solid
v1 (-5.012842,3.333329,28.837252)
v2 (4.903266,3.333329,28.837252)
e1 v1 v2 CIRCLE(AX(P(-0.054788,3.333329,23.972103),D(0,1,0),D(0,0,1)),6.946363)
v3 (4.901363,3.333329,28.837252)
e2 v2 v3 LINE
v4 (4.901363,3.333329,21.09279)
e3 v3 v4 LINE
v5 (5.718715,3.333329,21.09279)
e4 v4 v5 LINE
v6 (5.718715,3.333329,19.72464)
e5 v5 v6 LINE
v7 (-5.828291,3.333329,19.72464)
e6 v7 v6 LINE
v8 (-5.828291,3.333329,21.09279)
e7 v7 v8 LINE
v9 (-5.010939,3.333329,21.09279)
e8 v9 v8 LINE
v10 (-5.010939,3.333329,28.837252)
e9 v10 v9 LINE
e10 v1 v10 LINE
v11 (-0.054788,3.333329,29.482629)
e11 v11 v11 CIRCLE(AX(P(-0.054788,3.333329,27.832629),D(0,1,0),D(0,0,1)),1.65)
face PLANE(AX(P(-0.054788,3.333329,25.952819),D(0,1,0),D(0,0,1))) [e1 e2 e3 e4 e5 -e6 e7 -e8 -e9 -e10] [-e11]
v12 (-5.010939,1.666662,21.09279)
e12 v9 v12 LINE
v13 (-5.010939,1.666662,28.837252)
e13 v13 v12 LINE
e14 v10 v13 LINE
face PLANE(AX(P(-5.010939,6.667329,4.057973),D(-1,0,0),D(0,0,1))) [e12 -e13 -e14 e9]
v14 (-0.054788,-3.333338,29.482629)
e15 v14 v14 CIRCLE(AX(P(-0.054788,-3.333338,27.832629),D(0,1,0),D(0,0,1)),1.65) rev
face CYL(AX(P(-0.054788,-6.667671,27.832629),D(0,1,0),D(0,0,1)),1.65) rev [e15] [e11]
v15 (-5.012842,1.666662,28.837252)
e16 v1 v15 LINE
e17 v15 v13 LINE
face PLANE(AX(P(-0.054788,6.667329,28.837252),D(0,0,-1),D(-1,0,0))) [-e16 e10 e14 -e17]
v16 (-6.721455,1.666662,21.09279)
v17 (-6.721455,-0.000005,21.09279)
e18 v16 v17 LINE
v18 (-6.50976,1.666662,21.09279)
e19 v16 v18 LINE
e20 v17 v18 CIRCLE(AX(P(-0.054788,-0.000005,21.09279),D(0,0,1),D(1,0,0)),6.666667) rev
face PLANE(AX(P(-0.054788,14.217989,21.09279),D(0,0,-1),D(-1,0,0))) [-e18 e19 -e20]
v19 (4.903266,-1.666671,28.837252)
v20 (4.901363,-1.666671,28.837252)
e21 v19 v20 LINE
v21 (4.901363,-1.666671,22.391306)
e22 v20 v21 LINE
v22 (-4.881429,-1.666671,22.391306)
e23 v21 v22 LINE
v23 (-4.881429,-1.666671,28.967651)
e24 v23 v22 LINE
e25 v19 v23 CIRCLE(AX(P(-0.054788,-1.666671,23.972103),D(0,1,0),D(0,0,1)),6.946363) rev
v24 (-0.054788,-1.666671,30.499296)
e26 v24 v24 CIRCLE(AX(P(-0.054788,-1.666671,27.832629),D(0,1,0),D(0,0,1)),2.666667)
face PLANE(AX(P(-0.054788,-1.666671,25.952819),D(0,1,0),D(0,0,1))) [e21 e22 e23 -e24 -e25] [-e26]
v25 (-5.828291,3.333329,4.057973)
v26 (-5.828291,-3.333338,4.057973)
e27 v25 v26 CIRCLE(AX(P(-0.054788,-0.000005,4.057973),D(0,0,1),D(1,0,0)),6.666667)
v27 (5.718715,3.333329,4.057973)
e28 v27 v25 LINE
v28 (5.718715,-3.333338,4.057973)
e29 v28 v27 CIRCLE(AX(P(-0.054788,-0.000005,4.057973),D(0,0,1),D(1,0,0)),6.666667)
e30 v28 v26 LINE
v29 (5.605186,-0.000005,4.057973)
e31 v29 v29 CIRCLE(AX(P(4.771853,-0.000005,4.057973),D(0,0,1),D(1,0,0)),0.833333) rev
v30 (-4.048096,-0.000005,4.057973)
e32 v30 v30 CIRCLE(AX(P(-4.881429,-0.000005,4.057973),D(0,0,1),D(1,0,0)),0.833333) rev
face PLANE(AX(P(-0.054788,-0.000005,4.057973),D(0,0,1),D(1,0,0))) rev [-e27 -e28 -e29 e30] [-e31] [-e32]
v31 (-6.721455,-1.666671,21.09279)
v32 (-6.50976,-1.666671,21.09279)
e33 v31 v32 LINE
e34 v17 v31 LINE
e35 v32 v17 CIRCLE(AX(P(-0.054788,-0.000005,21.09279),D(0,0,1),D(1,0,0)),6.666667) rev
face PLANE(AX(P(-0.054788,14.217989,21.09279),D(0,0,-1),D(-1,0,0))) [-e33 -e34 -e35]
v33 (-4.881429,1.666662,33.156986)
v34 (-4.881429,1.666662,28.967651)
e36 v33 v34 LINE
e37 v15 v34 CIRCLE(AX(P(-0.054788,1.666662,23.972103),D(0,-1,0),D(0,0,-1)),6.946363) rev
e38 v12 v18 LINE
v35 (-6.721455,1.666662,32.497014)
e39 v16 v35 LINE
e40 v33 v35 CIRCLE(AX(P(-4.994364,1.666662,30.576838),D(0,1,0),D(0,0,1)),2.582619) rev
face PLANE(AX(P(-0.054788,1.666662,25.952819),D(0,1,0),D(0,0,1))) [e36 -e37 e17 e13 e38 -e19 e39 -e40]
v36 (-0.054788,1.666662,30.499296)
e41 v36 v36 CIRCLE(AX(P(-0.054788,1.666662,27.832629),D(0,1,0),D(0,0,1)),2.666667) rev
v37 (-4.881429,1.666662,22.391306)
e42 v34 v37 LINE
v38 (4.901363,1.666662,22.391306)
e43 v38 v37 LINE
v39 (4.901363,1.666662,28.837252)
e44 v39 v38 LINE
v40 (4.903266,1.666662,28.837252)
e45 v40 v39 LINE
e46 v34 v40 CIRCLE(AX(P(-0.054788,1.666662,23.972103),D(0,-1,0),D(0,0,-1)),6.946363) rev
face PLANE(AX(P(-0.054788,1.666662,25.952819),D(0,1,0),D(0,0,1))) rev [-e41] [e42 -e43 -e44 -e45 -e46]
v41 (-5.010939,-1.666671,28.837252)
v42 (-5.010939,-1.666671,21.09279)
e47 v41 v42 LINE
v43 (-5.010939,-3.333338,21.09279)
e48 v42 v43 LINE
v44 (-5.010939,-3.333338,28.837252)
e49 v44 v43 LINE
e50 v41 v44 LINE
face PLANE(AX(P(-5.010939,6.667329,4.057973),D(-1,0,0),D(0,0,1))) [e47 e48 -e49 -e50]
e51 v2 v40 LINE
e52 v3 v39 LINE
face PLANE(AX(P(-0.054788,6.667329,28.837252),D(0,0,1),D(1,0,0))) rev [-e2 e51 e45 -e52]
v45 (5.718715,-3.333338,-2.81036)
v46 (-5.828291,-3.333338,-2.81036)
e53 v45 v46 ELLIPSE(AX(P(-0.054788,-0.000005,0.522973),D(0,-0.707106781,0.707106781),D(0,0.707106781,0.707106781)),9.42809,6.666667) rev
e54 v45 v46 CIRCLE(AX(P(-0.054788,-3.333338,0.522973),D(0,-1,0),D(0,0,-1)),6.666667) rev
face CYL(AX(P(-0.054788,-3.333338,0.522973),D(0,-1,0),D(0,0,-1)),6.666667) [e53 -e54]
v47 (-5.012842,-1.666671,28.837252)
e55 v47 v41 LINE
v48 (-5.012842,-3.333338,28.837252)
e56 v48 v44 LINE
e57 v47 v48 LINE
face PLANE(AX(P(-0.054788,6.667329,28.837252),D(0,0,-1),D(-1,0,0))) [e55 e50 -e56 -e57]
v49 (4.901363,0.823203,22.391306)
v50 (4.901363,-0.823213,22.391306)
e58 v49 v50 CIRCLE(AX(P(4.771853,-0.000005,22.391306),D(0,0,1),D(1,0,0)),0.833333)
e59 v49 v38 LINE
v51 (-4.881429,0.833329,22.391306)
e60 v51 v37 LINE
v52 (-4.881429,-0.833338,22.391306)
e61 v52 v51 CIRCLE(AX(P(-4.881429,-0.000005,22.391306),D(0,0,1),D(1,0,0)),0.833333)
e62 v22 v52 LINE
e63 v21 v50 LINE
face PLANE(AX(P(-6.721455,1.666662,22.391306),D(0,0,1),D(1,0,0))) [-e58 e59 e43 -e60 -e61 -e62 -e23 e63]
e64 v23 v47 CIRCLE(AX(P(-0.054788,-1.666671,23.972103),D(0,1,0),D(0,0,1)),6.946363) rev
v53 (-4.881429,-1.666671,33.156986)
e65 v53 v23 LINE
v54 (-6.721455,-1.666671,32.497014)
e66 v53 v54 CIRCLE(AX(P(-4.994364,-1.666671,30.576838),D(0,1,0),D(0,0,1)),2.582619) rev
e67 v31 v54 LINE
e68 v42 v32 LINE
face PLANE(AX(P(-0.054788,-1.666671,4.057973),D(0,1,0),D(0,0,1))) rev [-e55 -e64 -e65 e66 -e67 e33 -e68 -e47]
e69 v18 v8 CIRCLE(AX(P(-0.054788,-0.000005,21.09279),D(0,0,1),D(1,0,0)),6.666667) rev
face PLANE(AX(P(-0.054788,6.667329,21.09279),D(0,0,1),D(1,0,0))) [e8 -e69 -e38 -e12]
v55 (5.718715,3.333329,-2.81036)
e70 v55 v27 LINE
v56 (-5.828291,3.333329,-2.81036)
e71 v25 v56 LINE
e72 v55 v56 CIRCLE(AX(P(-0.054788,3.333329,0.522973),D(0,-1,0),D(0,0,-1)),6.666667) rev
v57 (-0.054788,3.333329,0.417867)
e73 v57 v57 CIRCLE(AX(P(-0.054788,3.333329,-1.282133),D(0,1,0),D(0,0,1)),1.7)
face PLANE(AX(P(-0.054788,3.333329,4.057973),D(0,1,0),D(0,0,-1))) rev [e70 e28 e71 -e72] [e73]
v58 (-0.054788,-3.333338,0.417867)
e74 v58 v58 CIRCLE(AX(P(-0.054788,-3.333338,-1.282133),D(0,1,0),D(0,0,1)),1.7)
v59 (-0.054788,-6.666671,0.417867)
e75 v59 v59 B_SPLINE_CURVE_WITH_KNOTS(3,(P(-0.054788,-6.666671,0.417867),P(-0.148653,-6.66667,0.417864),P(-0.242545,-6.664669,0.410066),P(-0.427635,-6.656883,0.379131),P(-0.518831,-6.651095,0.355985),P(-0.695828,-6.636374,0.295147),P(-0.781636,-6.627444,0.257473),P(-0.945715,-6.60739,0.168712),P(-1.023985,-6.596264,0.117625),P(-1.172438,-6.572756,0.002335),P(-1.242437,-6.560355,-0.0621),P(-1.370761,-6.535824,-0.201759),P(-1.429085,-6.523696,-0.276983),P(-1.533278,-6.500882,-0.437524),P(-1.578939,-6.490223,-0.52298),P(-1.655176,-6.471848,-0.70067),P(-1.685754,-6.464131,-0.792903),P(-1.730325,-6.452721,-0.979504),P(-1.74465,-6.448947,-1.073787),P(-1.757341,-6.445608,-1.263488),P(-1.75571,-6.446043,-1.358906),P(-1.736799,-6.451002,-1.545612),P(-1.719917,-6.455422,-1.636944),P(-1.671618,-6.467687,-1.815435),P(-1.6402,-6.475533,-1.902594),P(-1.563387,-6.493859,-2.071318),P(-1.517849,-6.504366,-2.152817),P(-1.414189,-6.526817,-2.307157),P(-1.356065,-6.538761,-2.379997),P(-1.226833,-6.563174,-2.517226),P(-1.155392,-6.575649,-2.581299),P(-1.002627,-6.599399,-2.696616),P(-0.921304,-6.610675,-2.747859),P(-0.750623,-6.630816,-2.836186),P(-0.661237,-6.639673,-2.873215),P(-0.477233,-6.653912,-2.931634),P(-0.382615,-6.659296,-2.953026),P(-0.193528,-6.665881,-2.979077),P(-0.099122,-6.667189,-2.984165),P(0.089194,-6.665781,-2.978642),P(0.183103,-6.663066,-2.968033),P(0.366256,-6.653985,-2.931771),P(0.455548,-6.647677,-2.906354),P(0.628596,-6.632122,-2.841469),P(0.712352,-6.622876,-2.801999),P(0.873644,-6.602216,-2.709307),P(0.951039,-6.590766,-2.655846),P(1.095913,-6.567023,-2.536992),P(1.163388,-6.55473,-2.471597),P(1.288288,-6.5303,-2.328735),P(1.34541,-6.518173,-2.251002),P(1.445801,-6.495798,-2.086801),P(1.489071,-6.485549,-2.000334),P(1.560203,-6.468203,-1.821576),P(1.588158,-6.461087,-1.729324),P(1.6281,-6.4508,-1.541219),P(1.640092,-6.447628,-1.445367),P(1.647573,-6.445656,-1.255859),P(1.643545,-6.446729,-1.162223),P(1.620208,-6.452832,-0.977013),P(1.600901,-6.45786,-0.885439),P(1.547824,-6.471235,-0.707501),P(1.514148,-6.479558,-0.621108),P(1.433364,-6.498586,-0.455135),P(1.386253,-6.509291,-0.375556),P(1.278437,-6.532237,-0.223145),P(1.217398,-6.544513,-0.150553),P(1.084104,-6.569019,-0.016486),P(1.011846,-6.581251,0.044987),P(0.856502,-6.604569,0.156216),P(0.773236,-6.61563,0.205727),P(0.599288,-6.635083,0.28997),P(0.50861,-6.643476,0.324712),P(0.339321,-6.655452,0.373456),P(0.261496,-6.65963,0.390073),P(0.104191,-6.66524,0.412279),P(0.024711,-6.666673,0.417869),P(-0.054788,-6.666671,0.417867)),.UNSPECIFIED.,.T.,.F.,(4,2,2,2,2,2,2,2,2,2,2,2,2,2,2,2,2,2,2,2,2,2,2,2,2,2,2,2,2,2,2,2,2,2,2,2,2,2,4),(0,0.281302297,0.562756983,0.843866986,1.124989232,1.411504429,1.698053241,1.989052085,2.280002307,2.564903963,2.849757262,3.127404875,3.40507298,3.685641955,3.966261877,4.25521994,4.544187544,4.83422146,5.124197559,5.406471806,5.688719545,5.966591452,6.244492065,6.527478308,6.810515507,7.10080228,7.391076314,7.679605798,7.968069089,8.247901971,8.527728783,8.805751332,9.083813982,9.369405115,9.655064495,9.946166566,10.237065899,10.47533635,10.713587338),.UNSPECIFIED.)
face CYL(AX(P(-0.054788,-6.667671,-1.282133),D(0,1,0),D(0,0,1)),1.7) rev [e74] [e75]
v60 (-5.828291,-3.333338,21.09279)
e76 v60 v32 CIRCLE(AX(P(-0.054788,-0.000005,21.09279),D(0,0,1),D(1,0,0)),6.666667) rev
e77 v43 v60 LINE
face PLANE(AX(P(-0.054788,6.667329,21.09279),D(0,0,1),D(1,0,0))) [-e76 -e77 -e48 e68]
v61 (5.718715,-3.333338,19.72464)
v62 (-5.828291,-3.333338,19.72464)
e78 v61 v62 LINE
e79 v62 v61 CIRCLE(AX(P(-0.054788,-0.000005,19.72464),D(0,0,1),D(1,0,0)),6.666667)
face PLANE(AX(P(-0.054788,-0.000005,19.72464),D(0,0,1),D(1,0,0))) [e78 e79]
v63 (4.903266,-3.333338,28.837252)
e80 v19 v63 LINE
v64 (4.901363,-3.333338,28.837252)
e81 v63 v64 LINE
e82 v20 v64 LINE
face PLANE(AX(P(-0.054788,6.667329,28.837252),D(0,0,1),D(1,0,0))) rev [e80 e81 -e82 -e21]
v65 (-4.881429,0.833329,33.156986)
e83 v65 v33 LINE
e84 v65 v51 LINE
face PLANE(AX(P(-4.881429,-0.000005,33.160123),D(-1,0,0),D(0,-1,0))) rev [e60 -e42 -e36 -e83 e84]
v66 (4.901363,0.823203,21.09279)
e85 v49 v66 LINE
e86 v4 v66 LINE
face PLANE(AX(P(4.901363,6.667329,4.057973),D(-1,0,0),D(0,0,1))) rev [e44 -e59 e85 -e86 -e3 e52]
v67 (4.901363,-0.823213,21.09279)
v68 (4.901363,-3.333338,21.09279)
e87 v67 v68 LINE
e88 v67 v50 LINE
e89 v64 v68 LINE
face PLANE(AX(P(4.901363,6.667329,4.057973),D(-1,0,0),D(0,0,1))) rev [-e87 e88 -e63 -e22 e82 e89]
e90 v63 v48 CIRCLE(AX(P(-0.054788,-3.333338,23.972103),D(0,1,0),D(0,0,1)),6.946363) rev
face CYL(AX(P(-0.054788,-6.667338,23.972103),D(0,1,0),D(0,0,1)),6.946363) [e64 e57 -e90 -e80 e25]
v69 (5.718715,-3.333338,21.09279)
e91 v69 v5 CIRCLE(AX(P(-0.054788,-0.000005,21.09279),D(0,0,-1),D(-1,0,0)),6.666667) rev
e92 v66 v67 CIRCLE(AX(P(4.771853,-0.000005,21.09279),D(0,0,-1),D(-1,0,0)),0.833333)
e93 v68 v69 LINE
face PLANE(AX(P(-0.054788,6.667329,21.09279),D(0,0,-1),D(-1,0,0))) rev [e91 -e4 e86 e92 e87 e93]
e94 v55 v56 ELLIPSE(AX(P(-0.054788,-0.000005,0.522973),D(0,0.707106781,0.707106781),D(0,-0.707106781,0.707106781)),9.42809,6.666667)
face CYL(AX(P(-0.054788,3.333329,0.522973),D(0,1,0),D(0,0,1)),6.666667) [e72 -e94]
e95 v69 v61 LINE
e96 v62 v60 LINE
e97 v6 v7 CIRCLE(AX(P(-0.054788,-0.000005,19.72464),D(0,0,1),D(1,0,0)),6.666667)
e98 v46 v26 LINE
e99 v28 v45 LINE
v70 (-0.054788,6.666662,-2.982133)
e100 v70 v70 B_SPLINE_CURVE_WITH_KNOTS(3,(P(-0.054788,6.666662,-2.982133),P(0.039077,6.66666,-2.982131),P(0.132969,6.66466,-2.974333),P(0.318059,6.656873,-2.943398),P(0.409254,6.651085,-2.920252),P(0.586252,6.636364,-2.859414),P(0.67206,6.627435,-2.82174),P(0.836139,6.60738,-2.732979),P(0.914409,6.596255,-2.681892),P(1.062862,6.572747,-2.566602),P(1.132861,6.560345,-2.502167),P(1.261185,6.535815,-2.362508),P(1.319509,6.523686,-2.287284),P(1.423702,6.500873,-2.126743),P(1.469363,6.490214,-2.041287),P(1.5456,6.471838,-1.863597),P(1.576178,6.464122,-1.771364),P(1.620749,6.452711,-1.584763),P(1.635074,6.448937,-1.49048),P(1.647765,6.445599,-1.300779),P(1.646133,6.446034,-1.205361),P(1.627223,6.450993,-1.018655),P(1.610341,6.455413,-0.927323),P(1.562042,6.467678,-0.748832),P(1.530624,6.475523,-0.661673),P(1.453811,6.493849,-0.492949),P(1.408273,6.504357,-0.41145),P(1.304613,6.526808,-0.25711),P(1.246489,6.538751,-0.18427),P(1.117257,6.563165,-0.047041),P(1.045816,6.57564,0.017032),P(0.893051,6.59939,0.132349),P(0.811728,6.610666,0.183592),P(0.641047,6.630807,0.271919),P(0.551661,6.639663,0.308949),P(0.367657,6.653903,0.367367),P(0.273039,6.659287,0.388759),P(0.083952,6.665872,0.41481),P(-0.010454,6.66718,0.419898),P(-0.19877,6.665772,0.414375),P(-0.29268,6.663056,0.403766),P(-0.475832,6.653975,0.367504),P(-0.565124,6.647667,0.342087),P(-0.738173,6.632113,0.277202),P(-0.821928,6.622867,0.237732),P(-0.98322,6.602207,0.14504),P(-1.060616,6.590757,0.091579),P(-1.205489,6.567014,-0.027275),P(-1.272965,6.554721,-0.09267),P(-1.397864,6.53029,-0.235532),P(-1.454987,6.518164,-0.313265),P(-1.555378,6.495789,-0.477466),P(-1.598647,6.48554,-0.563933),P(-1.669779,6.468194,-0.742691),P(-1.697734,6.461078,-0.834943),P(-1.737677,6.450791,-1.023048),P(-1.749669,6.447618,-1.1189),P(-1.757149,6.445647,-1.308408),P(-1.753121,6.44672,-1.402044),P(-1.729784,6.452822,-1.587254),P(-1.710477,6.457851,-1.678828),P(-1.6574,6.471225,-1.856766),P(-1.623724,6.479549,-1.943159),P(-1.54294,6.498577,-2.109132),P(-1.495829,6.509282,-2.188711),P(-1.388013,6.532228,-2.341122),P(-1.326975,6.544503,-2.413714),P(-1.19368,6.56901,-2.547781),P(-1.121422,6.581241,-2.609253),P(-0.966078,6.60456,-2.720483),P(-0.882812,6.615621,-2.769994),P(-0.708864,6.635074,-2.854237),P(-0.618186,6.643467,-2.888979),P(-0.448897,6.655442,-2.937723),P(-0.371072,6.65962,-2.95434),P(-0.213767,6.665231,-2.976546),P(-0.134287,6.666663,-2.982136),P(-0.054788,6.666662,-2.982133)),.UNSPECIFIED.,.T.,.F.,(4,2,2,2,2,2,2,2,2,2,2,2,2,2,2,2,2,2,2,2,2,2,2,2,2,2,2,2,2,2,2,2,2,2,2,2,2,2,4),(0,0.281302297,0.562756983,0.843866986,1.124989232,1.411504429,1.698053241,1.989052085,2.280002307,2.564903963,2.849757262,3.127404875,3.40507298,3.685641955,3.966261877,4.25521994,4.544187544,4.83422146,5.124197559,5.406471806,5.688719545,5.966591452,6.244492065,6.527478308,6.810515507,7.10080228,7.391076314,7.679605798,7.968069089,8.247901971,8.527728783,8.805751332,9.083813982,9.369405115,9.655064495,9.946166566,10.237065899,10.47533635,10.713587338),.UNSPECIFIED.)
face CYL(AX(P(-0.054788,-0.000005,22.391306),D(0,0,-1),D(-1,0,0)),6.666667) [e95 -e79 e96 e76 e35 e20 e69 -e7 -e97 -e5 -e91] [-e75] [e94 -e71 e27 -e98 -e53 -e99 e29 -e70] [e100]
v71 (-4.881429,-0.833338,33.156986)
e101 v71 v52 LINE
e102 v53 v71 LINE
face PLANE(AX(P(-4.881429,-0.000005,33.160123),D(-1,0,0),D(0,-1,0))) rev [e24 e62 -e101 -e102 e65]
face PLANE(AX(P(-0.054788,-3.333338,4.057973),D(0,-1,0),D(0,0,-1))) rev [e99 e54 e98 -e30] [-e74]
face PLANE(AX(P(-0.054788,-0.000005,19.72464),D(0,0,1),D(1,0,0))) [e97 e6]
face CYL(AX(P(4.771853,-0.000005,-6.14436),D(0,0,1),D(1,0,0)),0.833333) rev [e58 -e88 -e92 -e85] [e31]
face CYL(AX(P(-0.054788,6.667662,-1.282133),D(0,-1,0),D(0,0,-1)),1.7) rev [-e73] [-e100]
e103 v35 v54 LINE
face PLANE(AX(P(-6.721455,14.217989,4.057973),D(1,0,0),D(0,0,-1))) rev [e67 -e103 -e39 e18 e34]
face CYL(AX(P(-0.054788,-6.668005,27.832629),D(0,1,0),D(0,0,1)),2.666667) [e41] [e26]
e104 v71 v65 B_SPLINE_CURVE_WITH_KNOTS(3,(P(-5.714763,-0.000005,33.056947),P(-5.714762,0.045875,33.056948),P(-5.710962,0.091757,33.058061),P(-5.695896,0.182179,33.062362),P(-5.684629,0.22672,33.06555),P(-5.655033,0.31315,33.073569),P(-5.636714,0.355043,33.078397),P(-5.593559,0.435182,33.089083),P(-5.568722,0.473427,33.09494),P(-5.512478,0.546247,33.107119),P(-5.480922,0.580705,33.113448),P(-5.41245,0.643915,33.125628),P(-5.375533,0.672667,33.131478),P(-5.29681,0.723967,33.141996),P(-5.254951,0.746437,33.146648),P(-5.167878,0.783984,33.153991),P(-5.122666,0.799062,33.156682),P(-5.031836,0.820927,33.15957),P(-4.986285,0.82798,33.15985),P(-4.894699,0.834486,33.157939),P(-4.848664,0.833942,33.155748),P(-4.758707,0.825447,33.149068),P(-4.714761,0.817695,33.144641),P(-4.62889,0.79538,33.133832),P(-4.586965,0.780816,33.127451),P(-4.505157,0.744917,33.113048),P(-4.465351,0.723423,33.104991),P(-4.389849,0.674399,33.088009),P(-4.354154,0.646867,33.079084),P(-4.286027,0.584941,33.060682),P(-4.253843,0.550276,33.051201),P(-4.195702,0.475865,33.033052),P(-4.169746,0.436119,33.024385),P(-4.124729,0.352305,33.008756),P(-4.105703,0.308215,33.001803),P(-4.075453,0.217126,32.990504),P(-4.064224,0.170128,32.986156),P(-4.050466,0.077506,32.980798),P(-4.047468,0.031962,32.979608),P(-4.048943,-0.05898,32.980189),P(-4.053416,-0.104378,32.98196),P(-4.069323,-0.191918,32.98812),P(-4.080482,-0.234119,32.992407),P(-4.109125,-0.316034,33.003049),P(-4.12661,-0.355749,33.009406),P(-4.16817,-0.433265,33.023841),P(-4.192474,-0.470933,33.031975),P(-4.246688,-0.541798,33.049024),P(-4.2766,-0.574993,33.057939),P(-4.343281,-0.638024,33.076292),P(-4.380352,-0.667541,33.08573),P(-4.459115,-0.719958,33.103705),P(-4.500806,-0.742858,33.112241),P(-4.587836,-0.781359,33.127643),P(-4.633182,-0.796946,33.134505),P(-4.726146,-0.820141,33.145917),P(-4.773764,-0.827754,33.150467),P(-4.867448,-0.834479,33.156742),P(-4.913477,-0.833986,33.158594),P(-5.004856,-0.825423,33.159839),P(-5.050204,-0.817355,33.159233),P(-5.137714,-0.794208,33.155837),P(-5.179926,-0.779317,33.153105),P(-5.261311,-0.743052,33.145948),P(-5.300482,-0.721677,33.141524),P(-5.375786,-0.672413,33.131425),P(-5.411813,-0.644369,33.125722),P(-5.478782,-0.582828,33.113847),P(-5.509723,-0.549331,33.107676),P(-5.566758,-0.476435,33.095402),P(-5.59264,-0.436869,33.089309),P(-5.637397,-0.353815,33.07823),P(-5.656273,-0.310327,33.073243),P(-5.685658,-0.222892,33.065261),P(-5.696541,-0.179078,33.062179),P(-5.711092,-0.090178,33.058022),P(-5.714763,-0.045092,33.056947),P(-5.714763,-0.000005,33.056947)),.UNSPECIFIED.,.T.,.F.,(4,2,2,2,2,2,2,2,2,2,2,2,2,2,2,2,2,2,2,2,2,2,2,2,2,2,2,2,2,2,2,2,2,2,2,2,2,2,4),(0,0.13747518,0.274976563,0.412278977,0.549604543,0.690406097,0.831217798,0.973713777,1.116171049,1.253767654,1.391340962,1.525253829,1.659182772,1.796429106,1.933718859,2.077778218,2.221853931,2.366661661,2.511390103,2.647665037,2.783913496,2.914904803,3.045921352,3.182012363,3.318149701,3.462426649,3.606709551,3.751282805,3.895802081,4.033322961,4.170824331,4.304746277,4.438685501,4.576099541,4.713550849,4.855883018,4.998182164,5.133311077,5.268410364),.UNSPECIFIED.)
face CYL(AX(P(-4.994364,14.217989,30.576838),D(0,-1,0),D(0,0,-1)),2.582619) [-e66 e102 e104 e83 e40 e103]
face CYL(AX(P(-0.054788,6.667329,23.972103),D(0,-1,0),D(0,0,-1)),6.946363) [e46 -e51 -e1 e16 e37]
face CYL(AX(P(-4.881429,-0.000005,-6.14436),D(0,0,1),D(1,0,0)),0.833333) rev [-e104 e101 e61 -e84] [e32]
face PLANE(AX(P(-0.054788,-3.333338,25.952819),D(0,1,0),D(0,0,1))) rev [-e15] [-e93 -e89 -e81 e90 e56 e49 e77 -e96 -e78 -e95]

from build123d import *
from build123d.topology import SkipClean

# Parameters (mm, degrees)
SKETCH2_R                       = 10
PHALANGE_LENGTH_DEPTH           = 27.5
BOSS_EXTRUDE3_DEPTH             = 5
BOSS_EXTRUDE4_DEPTH             = 5
BOSS_EXTRUDE4_DEPTH_BACK        = 5
CUT_EXTRUDE2_START              = -15.3025
CUT_EXTRUDE2_DEPTH              = 15.3025
SKETCH7_R                       = 1.65
CUT_EXTRUDE3_DEPTH              = 10
CUT_EXTRUDE4_DEPTH              = 2.5
CUT_EXTRUDE4_DEPTH_BACK         = 2.5
CUT_EXTRUDE7_REACH              = 48.49
SKETCH4_R                       = 1.65
CUT_EXTRUDE7_DIRECTION_2_REACH  = 48.49
CUT_EXTRUDE_THIN1_START         = 27.5
CUT_EXTRUDE_THIN1_DEPTH         = 10.361670454
BOSS_EXTRUDE5_REACH             = 47.744
SKETCH9_R                       = 4
SKETCH9_R_2                     = 1.65
CUT_EXTRUDE8_REACH              = 47.078
SKETCH10_R                      = 1.25
CUT_EXTRUDE9_START              = -4
CUT_EXTRUDE9_DEPTH              = 4
CUT_EXTRUDE10_REACH             = 47.744
CUT_EXTRUDE10_DIRECTION_2_REACH = 47.744
CUT_EXTRUDE11_START             = -10
CUT_EXTRUDE11_OUTLINE_W         = 2.565773848
CUT_EXTRUDE11_OUTLINE_H         = 11.6166929
CUT_EXTRUDE11_DEPTH             = 10
BOSS_EXTRUDE7_REACH             = 45.354
CUT_EXTRUDE12_REACH             = 47.078
SKETCH10_2_R                    = 1.25
CUT_EXTRUDE12_DIRECTION_2_REACH = 47.078
SKETCH17_R                      = 1.25
SKETCH17_W                      = 2.42123439
SKETCH17_H                      = 5
CUT_EXTRUDE14_DEPTH             = 16.148519
SCALE1_SCALE                    = 0.666666667
CUT_EXTRUDE15_START             = -10.000004
SKETCH18_R                      = 1.65
CUT_EXTRUDE15_DEPTH             = 13.333342
CUT_EXTRUDE16_START             = -3.333333
SKETCH19_R                      = 1.7
CUT_EXTRUDE16_DEPTH             = 13.333338


# Read off the part's stored shape, not the designer's step: Cut-Extrude-Thin1, Cut-Extrude11
with BuildPart() as part:
    # Sketch2 → Phalange Length (new body)
    with BuildSketch(Plane.XY):
        Circle(SKETCH2_R)
    extrude(amount=PHALANGE_LENGTH_DEPTH)

    # Sketch3 → Boss-Extrude3 (add)
    with BuildSketch(Plane(origin=(0, -10, 0), x_dir=(-1, 0, 0), z_dir=(0, -1, 0))):
        with BuildLine():
            Line((-10, 5.302499701), (-10, 0))
            Line((-10, 0), (10, 0))
            Line((10, 0), (10, 5.302499701))
            ThreePointArc((10, 5.302499701), (0, 15.302499701), (-10, 5.302499701))
        make_face()
    boss_extrude3 = extrude(amount=-BOSS_EXTRUDE3_DEPTH)

    # Mirror1: Boss-Extrude3 across plane
    add(boss_extrude3.mirror(Plane.ZX))

    # Sketch5 → Boss-Extrude4 (add, two sides: drawn at the far end of the back side and taken through both)
    with BuildSketch(Plane(origin=(0, 0, 0), x_dir=(1, 0, 0), z_dir=(0, 1, 0)).offset(-BOSS_EXTRUDE4_DEPTH_BACK)):
        with BuildLine():
            Line((-10, -33.283157911), (-10, -27.5))
            Line((-10, -27.5), (10, -27.5))
            Line((10, -27.5), (10, -33.283157911))
            ThreePointArc((10, -33.283157911), (0, -42.851984156), (-10, -33.283157911))
        make_face()
    extrude(amount=BOSS_EXTRUDE4_DEPTH + BOSS_EXTRUDE4_DEPTH_BACK)

    # Sketch6 → Cut-Extrude2 (cut)
    with SkipClean():  # the faces are left unmerged after this step: merging them gives an invalid solid
        with BuildSketch(Plane.XY.offset(CUT_EXTRUDE2_START)):
            with BuildLine():
                ThreePointArc((0, 10), (5, 8.660254038), (8.660254038, 5))
                Line((8.660254038, 5), (10, 5))
                Line((10, 5), (10, 10))
                Line((10, 10), (0, 10))
            make_face()
            with BuildLine():
                Line((10, -5), (8.660254038, -5))
                ThreePointArc((8.660254038, -5), (5, -8.660254038), (0, -10))
                Line((0, -10), (10, -10))
                Line((10, -10), (10, -5))
            make_face()
            with BuildLine():
                ThreePointArc((-8.660254038, 5), (-5, 8.660254038), (0, 10))
                Line((0, 10), (-10, 10))
                Line((-10, 10), (-10, 5))
                Line((-10, 5), (-8.660254038, 5))
            make_face()
            with BuildLine():
                Line((-10, -10), (0, -10))
                ThreePointArc((0, -10), (-5, -8.660254038), (-8.660254038, -5))
                Line((-8.660254038, -5), (-10, -5))
                Line((-10, -5), (-10, -10))
            make_face()
        extrude(amount=CUT_EXTRUDE2_DEPTH, mode=Mode.SUBTRACT)

    # Sketch7 → Cut-Extrude3 (cut)
    with SkipClean():  # the faces are left unmerged after this step: merging them gives an invalid solid
        with BuildSketch(Plane(origin=(0, 5, 0), x_dir=(1, 0, 0), z_dir=(0, 1, 0))):
            with Locations(Location((0, -35.661984156, 0), (0, 0, 270))):
                Circle(SKETCH7_R)
        extrude(amount=-CUT_EXTRUDE3_DEPTH, mode=Mode.SUBTRACT)

    # Sketch5<2> → Cut-Extrude4 (cut, two sides: drawn at the far end of the back side and taken through both)
    with BuildSketch(Plane(origin=(0, 0, 0), x_dir=(1, 0, 0), z_dir=(0, 1, 0)).offset(-CUT_EXTRUDE4_DEPTH_BACK)):
        with BuildLine():
            Line((-10, -33.283157911), (-10, -27.5))
            Line((-10, -27.5), (10, -27.5))
            Line((10, -27.5), (10, -33.283157911))
            ThreePointArc((10, -33.283157911), (0, -42.851984156), (-10, -33.283157911))
        make_face()
    extrude(amount=CUT_EXTRUDE4_DEPTH + CUT_EXTRUDE4_DEPTH_BACK, mode=Mode.SUBTRACT)

    # Sketch4 → Cut-Extrude7 (cut, up to next)
    with BuildSketch(Plane(origin=(0, -5, 0), x_dir=(1, 0, 0), z_dir=(0, 1, 0)), mode=Mode.PRIVATE) as cut_extrude7_sk1:
        with Locations(Location((0, 8.010159673, 0), (0, 0, 270))):
            Circle(SKETCH4_R)
    cut_extrude7_tool1 = extrude(cut_extrude7_sk1.sketch, amount=-CUT_EXTRUDE7_REACH, mode=Mode.PRIVATE) & part.part
    add(cut_extrude7_tool1.solids().sort_by_distance((0, -5, -8.01016))[0], mode=Mode.SUBTRACT)

    # Sketch4 → Cut-Extrude7 direction 2 (cut, up to next)
    with BuildSketch(Plane(origin=(0, -5, 0), x_dir=(1, 0, 0), z_dir=(0, 1, 0)), mode=Mode.PRIVATE) as cut_extrude7_direction_2_sk1:
        with Locations(Location((0, 8.010159673, 0), (0, 0, 270))):
            Circle(SKETCH4_R)
    cut_extrude7_direction_2_tool1 = extrude(cut_extrude7_direction_2_sk1.sketch, amount=CUT_EXTRUDE7_DIRECTION_2_REACH, mode=Mode.PRIVATE) & part.part
    add(cut_extrude7_direction_2_tool1.solids().sort_by_distance((0, -5, -8.01016))[0], mode=Mode.SUBTRACT)

    # Cut-Extrude-Thin1 outline → Cut-Extrude-Thin1 (cut)
    with SkipClean():  # the faces are left unmerged after this step: merging them gives an invalid solid
        with BuildSketch(Plane.XY.offset(CUT_EXTRUDE_THIN1_START)):
            with BuildLine():
                ThreePointArc((8.660254038, 5), (9.256147934, 3.78466979), (9.682458366, 2.5))
                Line((9.682458366, 2.5), (10, 2.5))
                Line((10, 2.5), (10, 5))
                Line((10, 5), (8.660254038, 5))
            make_face()
            with BuildLine():
                Line((10, -2.5), (9.682458366, -2.5))
                ThreePointArc((9.682458366, -2.5), (9.256147934, -3.78466979), (8.660254038, -5))
                Line((8.660254038, -5), (10, -5))
                Line((10, -5), (10, -2.5))
            make_face()
            with BuildLine():
                Line((-10, 2.5), (-9.682458366, 2.5))
                ThreePointArc((-9.682458366, 2.5), (-9.256147934, 3.78466979), (-8.660254038, 5))
                Line((-8.660254038, 5), (-10, 5))
                Line((-10, 5), (-10, 2.5))
            make_face()
            with BuildLine():
                ThreePointArc((-8.660254038, -5), (-9.256147934, -3.78466979), (-9.682458366, -2.5))
                Line((-9.682458366, -2.5), (-10, -2.5))
                Line((-10, -2.5), (-10, -5))
                Line((-10, -5), (-8.660254038, -5))
            make_face()
        extrude(amount=CUT_EXTRUDE_THIN1_DEPTH, mode=Mode.SUBTRACT)

    # Sketch9 → Boss-Extrude5 (add, up to next)
    with BuildSketch(Plane.XZ.offset(-2.5), mode=Mode.PRIVATE) as boss_extrude5_sk1:
        with Locations(Location((0, 35.661984156, 0), (0, 0, 90))):
            Circle(SKETCH9_R)
        with Locations(Location((0, 35.661984156, 0), (0, 0, 90))):
            Circle(SKETCH9_R_2, mode=Mode.SUBTRACT)
    boss_extrude5_tool1 = extrude(boss_extrude5_sk1.sketch, amount=BOSS_EXTRUDE5_REACH, mode=Mode.PRIVATE) - part.part
    add(boss_extrude5_tool1.solids().sort_by_distance((0, 2.5, 31.775121))[0])

    # Sketch10 → Cut-Extrude8 (cut, up to next)
    with BuildSketch(Plane.XY.offset(27.5), mode=Mode.PRIVATE) as cut_extrude8_sk1:
        with Locations((7.239961745, 0)):
            Circle(SKETCH10_R)
    cut_extrude8_tool1 = extrude(cut_extrude8_sk1.sketch, amount=-CUT_EXTRUDE8_REACH, mode=Mode.PRIVATE) & part.part
    # Sketch10 → Cut-Extrude8 (cut, up to next)
    with BuildSketch(Plane.XY.offset(27.5), mode=Mode.PRIVATE) as cut_extrude8_sk2:
        with Locations((-7.239961745, 0)):
            Circle(SKETCH10_R)
    cut_extrude8_tool2 = extrude(cut_extrude8_sk2.sketch, amount=-CUT_EXTRUDE8_REACH, mode=Mode.PRIVATE) & part.part
    add(cut_extrude8_tool1.solids().sort_by_distance((7.239962, 0, 27.5))[0], mode=Mode.SUBTRACT)
    add(cut_extrude8_tool2.solids().sort_by_distance((-7.239962, 0, 27.5))[0], mode=Mode.SUBTRACT)

    # Sketch11 → Cut-Extrude9 (cut)
    with SkipClean():  # the faces are left unmerged after this step: merging them gives an invalid solid
        with BuildSketch(Plane.XY.offset(27.5).offset(CUT_EXTRUDE9_START)):
            with BuildLine():
                ThreePointArc((8.660254038, 5), (0, 10), (-8.660254038, 5))
                Line((-8.660254038, 5), (8.660254038, 5))
            make_face()
            with BuildLine():
                Line((8.660254038, -5), (-8.660254038, -5))
                ThreePointArc((-8.660254038, -5), (0, -10), (8.660254038, -5))
            make_face()
        extrude(amount=CUT_EXTRUDE9_DEPTH, mode=Mode.SUBTRACT)

    # Sketch12 → Cut-Extrude10 (cut, up to next)
    with BuildSketch(Plane.XZ.offset(-2.5), mode=Mode.PRIVATE) as cut_extrude10_sk1:
        with BuildLine():
            Line((-10.033719202, 42.851984156), (-10.033719202, 35.664892021))
            Line((-10.033719202, 35.664892021), (-8.660254038, 35.664892021))
            ThreePointArc((-8.660254038, 35.664892021), (0, 40.290740593), (8.660254038, 35.664892021))
            Line((8.660254038, 35.664892021), (10.033719202, 35.664892021))
            Line((10.033719202, 35.664892021), (10.033719202, 42.851984156))
            Line((10.033719202, 42.851984156), (-10.033719202, 42.851984156))
        make_face()
    cut_extrude10_tool1 = extrude(cut_extrude10_sk1.sketch, amount=CUT_EXTRUDE10_REACH, mode=Mode.PRIVATE) & part.part
    add(cut_extrude10_tool1.solids().sort_by_distance((0, 2.5, 40.350279))[0], mode=Mode.SUBTRACT)

    # Sketch12 → Cut-Extrude10 direction 2 (cut, up to next)
    with BuildSketch(Plane.XZ.offset(-2.5), mode=Mode.PRIVATE) as cut_extrude10_direction_2_sk1:
        with BuildLine():
            Line((-10.033719202, 42.851984156), (-10.033719202, 35.664892021))
            Line((-10.033719202, 35.664892021), (-8.660254038, 35.664892021))
            ThreePointArc((-8.660254038, 35.664892021), (0, 40.290740593), (8.660254038, 35.664892021))
            Line((8.660254038, 35.664892021), (10.033719202, 35.664892021))
            Line((10.033719202, 35.664892021), (10.033719202, 42.851984156))
            Line((10.033719202, 42.851984156), (-10.033719202, 42.851984156))
        make_face()
    cut_extrude10_direction_2_tool1 = extrude(cut_extrude10_direction_2_sk1.sketch, amount=-CUT_EXTRUDE10_DIRECTION_2_REACH, mode=Mode.PRIVATE) & part.part
    add(cut_extrude10_direction_2_tool1.solids().sort_by_distance((0, 2.5, 40.350279))[0], mode=Mode.SUBTRACT)

    # Cut-Extrude11 outline → Cut-Extrude11 (cut)
    with BuildSketch(Plane.XZ.offset(5).offset(CUT_EXTRUDE11_START)):
        with Locations((-8.717113076, 31.360571369)):
            Rectangle(CUT_EXTRUDE11_OUTLINE_W, CUT_EXTRUDE11_OUTLINE_H)
        with Locations((8.717113076, 31.360571369)):
            Rectangle(CUT_EXTRUDE11_OUTLINE_W, CUT_EXTRUDE11_OUTLINE_H)
    extrude(amount=CUT_EXTRUDE11_DEPTH, mode=Mode.SUBTRACT)

    # Boss-Extrude7: up to this face of the body (flat: up to its plane)
    boss_extrude7_end = Plane(part.part.faces().sort_by_distance((0, 2.5, 27.696174341))[0])
    # Sketch16 → Boss-Extrude7 (add, up to the picked face)
    with BuildSketch(Plane(origin=(0, -2.5, 0), x_dir=(1, 0, 0), z_dir=(0, 1, 0)), mode=Mode.PRIVATE) as boss_extrude7_sk1:
        with BuildLine():
            Line((-4.818727355, -25.552224919), (-7.434226152, -25.552224919))
            Line((-7.434226152, -25.552224919), (-10, -25.552224919))
            Line((-10, -25.552224919), (-10, -42.658561033))
            ThreePointArc((-10, -42.658561033), (-8.808295471, -43.390817912), (-7.43422564, -43.652145139))
            ThreePointArc((-7.43422564, -43.652145139), (-6.033645007, -43.399721533), (-4.818727355, -42.658561033))
            Line((-4.818727355, -42.658561033), (-4.818727355, -39.109527951))
            ThreePointArc((-4.818727355, -39.109527951), (-6.204248493, -38.242230104), (-7.437080645, -37.168917819))
            Line((-7.437080645, -37.168917819), (-7.434226152, -37.168917819))
            Line((-7.434226152, -37.168917819), (-7.434226152, -27.5))
            Line((-7.434226152, -27.5), (-4.818727355, -27.5))
            Line((-4.818727355, -27.5), (-4.818727355, -25.552224919))
        make_face()
    boss_extrude7_tool1 = split(extrude(boss_extrude7_sk1.sketch, amount=BOSS_EXTRUDE7_REACH, mode=Mode.PRIVATE), bisect_by=boss_extrude7_end, keep=Keep.BOTH, mode=Mode.PRIVATE)
    # Sketch16 → Boss-Extrude7 (add, up to the picked face)
    with BuildSketch(Plane(origin=(0, -2.5, 0), x_dir=(1, 0, 0), z_dir=(0, 1, 0)), mode=Mode.PRIVATE) as boss_extrude7_sk2:
        with BuildLine():
            Line((-4.818727355, -39.109527951), (-4.818727355, -27.5))
            Line((-4.818727355, -27.5), (-7.434226152, -27.5))
            Line((-7.434226152, -27.5), (-7.434226152, -37.168917819))
            Line((-7.434226152, -37.168917819), (-7.437080645, -37.168917819))
            ThreePointArc((-7.437080645, -37.168917819), (-6.204248493, -38.242230104), (-4.818727355, -39.109527951))
        make_face()
    boss_extrude7_tool2 = split(extrude(boss_extrude7_sk2.sketch, amount=BOSS_EXTRUDE7_REACH, mode=Mode.PRIVATE), bisect_by=boss_extrude7_end, keep=Keep.BOTH, mode=Mode.PRIVATE)
    add(boss_extrude7_tool1.solids().sort_by(Axis((-7.989429, -2.5, 35.133344), (0, 1, 0)))[0])
    add(boss_extrude7_tool2.solids().sort_by(Axis((-6.08748, -2.5, 32.8879), (0, 1, 0)))[0])

    # Sketch10<2> → Cut-Extrude12 (cut, up to next)
    with BuildSketch(Plane.XY.offset(27.5), mode=Mode.PRIVATE) as cut_extrude12_sk1:
        with Locations((-7.239961745, 0)):
            Circle(SKETCH10_2_R)
    cut_extrude12_tool1 = extrude(cut_extrude12_sk1.sketch, amount=CUT_EXTRUDE12_REACH, mode=Mode.PRIVATE) & part.part
    add(cut_extrude12_tool1.solids().sort_by_distance((-7.239962, 0, 27.5))[0], mode=Mode.SUBTRACT)

    # Sketch10<2> → Cut-Extrude12 direction 2 (cut, up to next)
    with BuildSketch(Plane.XY.offset(27.5), mode=Mode.PRIVATE) as cut_extrude12_direction_2_sk1:
        with Locations((-7.239961745, 0)):
            Circle(SKETCH10_2_R)
    cut_extrude12_direction_2_tool1 = extrude(cut_extrude12_direction_2_sk1.sketch, amount=-CUT_EXTRUDE12_DIRECTION_2_REACH, mode=Mode.PRIVATE) & part.part
    add(cut_extrude12_direction_2_tool1.solids().sort_by_distance((-7.239962, 0, 27.5))[0], mode=Mode.SUBTRACT)

    # Sketch17 → Cut-Extrude14 (cut)
    with SkipClean():  # the faces are left unmerged after this step: merging them gives an invalid solid
        with BuildSketch(Plane.XY.offset(27.5)):
            with Locations((-7.239961745, 0)):
                Circle(SKETCH17_R)
            with Locations((-6.02934455, 0)):
                Rectangle(SKETCH17_W, SKETCH17_H)
        extrude(amount=CUT_EXTRUDE14_DEPTH, mode=Mode.SUBTRACT)


with BuildPart() as part_1:
    # Scale1: scaled about (-0.164338402, -1.53e-07, 12.17341687)
    add(part.part.scale(SCALE1_SCALE).moved(Location((-0.054779467, -5.1e-08, 4.057805623))))

    # Sketch18 → Cut-Extrude15 (cut)
    with BuildSketch(Plane(origin=(0, 3.333328643, 0), x_dir=(1, 0, 0), z_dir=(0, 1, 0)).offset(CUT_EXTRUDE15_START)):
        with Locations(Location((-0.054788063, -27.832629086, 0), (0, 0, 270))):
            Circle(SKETCH18_R)
    extrude(amount=CUT_EXTRUDE15_DEPTH, mode=Mode.SUBTRACT)

    # Sketch19 → Cut-Extrude16 (cut)
    with BuildSketch(Plane(origin=(0, -3.333338023, 0), x_dir=(1, 0, 0), z_dir=(0, 1, 0)).offset(CUT_EXTRUDE16_START)):
        with Locations(Location((-0.054788063, 1.282133466, 0), (0, 0, 90))):
            Circle(SKETCH19_R)
    extrude(amount=CUT_EXTRUDE16_DEPTH, mode=Mode.SUBTRACT)


solid = part_1.part
